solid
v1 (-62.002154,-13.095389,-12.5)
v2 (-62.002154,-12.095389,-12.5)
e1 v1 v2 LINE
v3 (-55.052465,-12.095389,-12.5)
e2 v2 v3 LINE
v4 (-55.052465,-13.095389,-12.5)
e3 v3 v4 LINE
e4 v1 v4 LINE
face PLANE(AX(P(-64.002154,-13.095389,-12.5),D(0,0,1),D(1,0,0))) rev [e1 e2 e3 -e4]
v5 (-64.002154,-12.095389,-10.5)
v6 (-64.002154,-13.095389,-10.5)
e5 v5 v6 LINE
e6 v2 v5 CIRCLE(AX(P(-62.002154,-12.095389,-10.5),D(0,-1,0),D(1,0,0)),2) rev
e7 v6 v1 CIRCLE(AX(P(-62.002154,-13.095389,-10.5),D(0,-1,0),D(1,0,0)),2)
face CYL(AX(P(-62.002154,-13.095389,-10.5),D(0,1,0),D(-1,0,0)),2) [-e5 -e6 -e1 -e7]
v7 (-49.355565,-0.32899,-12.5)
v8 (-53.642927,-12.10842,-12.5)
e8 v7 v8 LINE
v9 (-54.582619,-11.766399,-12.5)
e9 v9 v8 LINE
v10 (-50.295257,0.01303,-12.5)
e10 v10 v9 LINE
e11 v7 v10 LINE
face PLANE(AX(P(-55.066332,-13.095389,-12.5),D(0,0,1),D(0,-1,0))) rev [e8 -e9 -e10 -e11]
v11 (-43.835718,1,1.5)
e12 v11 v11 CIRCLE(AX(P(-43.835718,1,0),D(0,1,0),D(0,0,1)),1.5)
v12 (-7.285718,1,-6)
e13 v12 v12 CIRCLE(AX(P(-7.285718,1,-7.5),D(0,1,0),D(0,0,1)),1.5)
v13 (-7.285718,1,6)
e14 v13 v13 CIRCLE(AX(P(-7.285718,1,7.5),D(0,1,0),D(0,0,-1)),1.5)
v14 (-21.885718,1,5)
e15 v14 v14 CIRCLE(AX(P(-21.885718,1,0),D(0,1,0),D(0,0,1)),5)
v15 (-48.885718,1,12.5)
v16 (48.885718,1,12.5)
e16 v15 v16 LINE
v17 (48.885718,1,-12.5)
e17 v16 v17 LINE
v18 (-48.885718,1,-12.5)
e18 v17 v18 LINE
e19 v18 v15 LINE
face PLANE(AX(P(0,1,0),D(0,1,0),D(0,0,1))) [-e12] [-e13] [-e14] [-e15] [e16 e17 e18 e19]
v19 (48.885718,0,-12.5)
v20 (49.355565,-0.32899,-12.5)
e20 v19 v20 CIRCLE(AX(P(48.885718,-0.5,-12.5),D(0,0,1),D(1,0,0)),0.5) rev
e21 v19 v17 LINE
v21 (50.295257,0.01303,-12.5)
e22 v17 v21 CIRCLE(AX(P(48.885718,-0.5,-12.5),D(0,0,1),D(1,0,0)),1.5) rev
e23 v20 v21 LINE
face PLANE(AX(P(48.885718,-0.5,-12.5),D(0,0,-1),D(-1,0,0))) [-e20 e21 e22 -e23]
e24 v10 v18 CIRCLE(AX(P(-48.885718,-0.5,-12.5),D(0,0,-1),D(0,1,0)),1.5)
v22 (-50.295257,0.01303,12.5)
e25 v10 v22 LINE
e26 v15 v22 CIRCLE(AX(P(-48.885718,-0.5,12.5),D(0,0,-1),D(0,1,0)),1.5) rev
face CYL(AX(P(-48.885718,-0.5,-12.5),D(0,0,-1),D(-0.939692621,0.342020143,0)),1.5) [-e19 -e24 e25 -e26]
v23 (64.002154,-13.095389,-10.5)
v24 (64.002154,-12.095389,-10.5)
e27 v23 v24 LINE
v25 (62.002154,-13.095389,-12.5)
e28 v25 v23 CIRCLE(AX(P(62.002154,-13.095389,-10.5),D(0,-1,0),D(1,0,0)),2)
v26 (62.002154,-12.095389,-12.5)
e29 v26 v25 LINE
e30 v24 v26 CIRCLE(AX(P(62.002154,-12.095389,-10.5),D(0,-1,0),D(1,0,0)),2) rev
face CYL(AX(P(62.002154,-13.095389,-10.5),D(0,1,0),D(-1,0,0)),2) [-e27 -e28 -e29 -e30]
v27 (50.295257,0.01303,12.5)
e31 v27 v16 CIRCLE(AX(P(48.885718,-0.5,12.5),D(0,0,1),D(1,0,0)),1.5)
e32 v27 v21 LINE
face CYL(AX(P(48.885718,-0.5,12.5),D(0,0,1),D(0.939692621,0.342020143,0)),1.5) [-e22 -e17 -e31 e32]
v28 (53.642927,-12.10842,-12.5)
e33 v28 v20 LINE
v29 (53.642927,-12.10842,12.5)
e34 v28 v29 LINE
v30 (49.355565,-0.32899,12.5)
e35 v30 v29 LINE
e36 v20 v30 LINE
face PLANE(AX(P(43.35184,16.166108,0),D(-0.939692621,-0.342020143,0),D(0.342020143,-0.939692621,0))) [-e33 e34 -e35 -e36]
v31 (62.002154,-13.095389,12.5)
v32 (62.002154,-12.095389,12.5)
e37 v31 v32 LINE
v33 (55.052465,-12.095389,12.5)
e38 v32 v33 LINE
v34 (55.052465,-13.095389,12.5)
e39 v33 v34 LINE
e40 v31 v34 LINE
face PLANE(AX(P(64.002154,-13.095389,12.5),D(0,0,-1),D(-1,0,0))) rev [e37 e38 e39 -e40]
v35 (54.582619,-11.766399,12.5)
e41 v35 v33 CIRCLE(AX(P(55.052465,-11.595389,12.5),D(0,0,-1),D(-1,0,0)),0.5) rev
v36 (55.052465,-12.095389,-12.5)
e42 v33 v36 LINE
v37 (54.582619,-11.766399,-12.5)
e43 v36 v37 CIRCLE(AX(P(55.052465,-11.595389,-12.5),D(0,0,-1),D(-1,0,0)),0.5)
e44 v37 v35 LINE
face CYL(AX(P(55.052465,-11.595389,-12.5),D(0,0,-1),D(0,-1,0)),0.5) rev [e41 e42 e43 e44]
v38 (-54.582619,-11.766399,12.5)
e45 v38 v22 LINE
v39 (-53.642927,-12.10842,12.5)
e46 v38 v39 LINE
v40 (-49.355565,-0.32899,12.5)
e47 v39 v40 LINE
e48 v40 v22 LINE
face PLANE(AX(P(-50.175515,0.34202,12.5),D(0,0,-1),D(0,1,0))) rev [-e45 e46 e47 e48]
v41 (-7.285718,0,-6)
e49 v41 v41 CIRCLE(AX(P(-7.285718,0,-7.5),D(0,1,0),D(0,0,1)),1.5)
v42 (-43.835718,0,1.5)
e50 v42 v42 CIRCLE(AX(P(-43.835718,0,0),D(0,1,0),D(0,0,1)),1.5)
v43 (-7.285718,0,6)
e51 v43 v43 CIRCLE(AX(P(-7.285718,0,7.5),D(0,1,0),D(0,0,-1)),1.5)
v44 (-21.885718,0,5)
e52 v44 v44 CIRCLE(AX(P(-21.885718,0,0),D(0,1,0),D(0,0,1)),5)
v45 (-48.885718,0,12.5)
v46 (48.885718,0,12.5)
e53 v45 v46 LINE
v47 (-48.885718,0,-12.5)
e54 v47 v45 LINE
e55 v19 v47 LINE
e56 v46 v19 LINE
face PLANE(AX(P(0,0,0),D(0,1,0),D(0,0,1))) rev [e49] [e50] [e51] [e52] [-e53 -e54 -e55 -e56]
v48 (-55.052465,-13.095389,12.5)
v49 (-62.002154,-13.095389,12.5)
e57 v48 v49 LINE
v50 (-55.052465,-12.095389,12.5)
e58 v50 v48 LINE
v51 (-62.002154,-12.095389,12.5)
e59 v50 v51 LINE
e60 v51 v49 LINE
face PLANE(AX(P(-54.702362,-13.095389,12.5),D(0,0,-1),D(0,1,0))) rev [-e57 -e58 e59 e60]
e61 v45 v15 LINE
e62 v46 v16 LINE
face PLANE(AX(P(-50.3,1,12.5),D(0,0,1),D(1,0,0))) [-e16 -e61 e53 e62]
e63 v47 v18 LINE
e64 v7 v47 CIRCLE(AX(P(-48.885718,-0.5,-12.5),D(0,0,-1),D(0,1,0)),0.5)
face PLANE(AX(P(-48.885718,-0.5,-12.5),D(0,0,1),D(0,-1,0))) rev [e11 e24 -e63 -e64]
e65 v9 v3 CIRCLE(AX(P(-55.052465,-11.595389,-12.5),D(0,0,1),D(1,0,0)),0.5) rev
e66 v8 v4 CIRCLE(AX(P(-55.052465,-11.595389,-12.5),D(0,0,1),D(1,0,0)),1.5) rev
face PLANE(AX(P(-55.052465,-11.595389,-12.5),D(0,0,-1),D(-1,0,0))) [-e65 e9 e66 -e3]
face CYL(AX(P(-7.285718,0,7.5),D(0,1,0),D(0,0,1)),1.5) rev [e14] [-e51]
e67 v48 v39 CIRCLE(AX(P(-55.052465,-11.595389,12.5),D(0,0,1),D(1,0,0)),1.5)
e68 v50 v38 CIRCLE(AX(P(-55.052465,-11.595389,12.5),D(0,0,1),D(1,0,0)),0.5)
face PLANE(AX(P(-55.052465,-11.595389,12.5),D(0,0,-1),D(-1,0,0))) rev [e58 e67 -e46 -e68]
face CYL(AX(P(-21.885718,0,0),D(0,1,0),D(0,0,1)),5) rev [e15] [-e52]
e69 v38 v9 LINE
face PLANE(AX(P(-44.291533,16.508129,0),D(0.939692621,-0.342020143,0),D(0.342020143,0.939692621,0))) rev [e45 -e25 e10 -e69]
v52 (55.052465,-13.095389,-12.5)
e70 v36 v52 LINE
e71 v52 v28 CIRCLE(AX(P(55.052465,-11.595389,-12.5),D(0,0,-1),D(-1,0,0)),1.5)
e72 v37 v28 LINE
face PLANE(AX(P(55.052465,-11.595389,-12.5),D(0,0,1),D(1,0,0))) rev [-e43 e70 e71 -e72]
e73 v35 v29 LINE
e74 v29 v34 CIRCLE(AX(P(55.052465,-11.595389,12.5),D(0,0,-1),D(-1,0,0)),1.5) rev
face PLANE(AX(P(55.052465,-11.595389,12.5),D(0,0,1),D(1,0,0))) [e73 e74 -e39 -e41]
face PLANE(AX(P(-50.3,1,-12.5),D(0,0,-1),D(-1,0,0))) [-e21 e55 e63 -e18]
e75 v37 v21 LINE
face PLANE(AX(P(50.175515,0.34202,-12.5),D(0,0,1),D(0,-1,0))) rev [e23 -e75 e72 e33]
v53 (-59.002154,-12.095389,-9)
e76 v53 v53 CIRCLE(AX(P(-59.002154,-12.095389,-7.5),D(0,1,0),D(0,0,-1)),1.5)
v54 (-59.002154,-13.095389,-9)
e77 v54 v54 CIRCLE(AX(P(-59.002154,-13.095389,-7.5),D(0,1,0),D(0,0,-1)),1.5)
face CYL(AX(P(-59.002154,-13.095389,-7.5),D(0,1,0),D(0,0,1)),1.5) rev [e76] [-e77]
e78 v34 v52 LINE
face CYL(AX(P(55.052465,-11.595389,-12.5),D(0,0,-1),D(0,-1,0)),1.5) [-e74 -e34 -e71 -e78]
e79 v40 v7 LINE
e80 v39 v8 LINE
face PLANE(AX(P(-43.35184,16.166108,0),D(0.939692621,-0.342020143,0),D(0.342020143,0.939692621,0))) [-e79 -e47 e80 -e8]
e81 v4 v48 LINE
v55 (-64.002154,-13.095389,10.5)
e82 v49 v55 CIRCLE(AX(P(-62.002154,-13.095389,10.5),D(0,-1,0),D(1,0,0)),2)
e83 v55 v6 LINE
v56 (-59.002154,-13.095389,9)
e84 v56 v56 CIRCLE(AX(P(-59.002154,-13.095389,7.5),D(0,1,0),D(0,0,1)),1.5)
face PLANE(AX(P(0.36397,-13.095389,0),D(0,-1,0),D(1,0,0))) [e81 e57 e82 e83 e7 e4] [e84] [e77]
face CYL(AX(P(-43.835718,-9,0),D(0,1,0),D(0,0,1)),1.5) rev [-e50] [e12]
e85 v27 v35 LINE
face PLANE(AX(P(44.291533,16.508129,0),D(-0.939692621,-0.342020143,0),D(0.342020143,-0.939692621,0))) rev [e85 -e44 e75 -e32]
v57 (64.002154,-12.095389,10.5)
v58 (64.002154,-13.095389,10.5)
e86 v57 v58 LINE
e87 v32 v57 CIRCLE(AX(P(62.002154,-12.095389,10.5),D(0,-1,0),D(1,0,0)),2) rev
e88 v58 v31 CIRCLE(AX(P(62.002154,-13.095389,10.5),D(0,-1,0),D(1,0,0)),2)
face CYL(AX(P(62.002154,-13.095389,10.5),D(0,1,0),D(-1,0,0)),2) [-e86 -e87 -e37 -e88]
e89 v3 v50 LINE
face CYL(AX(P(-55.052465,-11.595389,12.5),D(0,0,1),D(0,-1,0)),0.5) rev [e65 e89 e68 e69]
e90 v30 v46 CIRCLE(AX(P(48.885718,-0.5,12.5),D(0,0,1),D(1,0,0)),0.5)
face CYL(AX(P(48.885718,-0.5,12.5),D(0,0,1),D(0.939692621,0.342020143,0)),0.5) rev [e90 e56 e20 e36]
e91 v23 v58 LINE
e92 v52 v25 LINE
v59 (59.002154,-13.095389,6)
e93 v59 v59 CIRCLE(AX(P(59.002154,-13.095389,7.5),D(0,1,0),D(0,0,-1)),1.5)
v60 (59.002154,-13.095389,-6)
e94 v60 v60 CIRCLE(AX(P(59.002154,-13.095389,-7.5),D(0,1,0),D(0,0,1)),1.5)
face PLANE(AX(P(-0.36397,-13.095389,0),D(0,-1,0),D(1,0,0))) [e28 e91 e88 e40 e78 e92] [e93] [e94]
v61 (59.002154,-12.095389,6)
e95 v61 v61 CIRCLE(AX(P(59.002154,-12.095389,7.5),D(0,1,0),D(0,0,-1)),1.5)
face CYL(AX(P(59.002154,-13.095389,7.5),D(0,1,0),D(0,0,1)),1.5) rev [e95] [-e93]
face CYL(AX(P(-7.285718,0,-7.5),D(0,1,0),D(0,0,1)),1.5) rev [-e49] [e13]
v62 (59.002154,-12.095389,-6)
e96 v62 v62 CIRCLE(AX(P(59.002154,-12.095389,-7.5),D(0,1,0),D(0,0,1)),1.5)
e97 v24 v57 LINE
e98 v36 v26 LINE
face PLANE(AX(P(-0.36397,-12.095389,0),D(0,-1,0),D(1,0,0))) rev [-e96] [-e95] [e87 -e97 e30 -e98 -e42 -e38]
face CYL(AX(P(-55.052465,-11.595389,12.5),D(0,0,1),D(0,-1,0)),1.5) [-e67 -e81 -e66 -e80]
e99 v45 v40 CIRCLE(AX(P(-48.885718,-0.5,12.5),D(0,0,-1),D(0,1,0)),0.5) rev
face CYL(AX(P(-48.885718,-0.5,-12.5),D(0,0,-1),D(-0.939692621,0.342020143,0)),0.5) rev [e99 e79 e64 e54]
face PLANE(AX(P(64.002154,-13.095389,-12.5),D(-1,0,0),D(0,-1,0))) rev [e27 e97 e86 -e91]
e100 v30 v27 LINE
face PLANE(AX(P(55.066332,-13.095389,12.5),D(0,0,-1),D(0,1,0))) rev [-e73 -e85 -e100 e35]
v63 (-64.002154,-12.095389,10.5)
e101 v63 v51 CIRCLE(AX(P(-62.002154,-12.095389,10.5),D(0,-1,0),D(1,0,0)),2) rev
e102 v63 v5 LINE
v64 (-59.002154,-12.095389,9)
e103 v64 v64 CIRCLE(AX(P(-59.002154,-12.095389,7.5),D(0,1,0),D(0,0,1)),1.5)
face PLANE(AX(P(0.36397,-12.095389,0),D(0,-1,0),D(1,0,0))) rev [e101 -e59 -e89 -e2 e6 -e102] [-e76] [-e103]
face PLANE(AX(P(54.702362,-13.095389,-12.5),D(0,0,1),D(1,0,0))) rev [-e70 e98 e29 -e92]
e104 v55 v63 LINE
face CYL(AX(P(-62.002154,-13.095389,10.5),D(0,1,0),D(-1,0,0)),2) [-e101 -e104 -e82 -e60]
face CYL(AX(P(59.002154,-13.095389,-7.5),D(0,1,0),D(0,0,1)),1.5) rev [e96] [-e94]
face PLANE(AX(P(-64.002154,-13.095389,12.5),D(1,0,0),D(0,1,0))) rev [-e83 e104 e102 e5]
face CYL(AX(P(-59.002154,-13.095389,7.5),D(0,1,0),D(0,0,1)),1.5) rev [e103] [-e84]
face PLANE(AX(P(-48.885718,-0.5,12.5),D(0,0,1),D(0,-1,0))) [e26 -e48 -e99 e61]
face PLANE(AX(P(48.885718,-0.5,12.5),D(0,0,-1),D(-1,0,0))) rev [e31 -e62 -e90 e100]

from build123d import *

# Parameters (mm, degrees)
SKETCH_1_W               = 100.6
SKETCH_1_H               = 25
EXTRUDE_1_DEPTH          = 1
SM_START                 = -12.5
SM_EDGE_FLANGE_1_DEPTH   = 25
SM_EDGE_FLANGE_1_2_DEPTH = 25
SM_EDGE_FLANGE_2_DEPTH   = 25
SM_EDGE_FLANGE_2_2_DEPTH = 25
SKETCH_18_R              = 1.5
CUT_EXTRUDE_1_DEPTH      = 1
SKETCH_19_R              = 1.5
CUT_EXTRUDE_2_DEPTH      = 1
FILLET_1_R               = 2
SKETCH_21_R              = 5
CUT_EXTRUDE_3_DEPTH      = 1
SKETCH_22_R              = 1.5
CUT_EXTRUDE_4_DEPTH      = 10


# Read off the part's stored shape, not the designer's step: Ребро-кромка1, Ребро-кромка2
with BuildPart() as part:
    # Sketch 1 → Бобышка-Вытянуть1 (new body)
    with BuildSketch(Plane(origin=(0, 0, 0), x_dir=(1, 0, 0), z_dir=(0, 1, 0))):
        Rectangle(SKETCH_1_W, SKETCH_1_H)
    extrude(amount=EXTRUDE_1_DEPTH)

    # Ребро-кромка1 outline → Ребро-кромка1 (cut)
    with BuildSketch(Plane.XY.offset(SM_START)):
        with BuildLine():
            Line((-50.3, 0), (-50.29525739, 0.013030215))
            ThreePointArc((-50.29525739, 0.013030215), (-49.746083113, 0.728728066), (-48.885718458, 1))
            Line((-48.885718458, 1), (-50.3, 1))
            Line((-50.3, 1), (-50.3, 0))
        make_face()
        with BuildLine():
            Line((50.3, 1), (48.885718458, 1))
            ThreePointArc((48.885718458, 1), (49.746083113, 0.728728066), (50.29525739, 0.013030215))
            Line((50.29525739, 0.013030215), (50.3, 0))
            Line((50.3, 0), (50.3, 1))
        make_face()
    extrude(amount=SM_EDGE_FLANGE_1_DEPTH, mode=Mode.SUBTRACT)

    # Sm Edge Flange 1 2 outline → Sm Edge Flange 1 2 (add)
    with BuildSketch(Plane.XY.offset(SM_START)):
        with BuildLine():
            Line((-48.885718458, 0), (-50.3, 0))
            Line((-50.3, 0), (-55.066331916, -13.095389312))
            Line((-55.066331916, -13.095389312), (-54.126639295, -13.437409455))
            Line((-54.126639295, -13.437409455), (-49.355564769, -0.328989928))
            ThreePointArc((-49.355564769, -0.328989928), (-49.172506676, -0.090423978), (-48.885718458, 0))
        make_face()
        with BuildLine():
            Line((50.3, 0), (48.885718458, 0))
            ThreePointArc((48.885718458, 0), (49.172506676, -0.090423978), (49.355564769, -0.328989928))
            Line((49.355564769, -0.328989928), (54.126639295, -13.437409455))
            Line((54.126639295, -13.437409455), (55.066331916, -13.095389312))
            Line((55.066331916, -13.095389312), (50.3, 0))
        make_face()
    extrude(amount=SM_EDGE_FLANGE_1_2_DEPTH)

    # Ребро-кромка2 outline → Ребро-кромка2 (cut)
    with BuildSketch(Plane.XY.offset(SM_START)):
        with BuildLine():
            Line((55.066331916, -13.095389312), (55.05246545, -13.095389312))
            ThreePointArc((55.05246545, -13.095389312), (54.192100796, -12.824117378), (53.642926519, -12.108419527))
            Line((53.642926519, -12.108419527), (54.126639295, -13.437409455))
            Line((54.126639295, -13.437409455), (55.066331916, -13.095389312))
        make_face()
        with BuildLine():
            Line((-55.05246545, -13.095389312), (-55.066331916, -13.095389312))
            Line((-55.066331916, -13.095389312), (-54.126639295, -13.437409455))
            Line((-54.126639295, -13.437409455), (-53.642926519, -12.108419527))
            ThreePointArc((-53.642926519, -12.108419527), (-54.192100796, -12.824117378), (-55.05246545, -13.095389312))
        make_face()
    extrude(amount=SM_EDGE_FLANGE_2_DEPTH, mode=Mode.SUBTRACT)

    # Sm Edge Flange 2 2 outline → Sm Edge Flange 2 2 (add)
    with BuildSketch(Plane.XY.offset(SM_START)):
        with BuildLine():
            Line((54.58261914, -11.766399383), (55.066331916, -13.095389312))
            Line((55.066331916, -13.095389312), (64.002154143, -13.095389312))
            Line((64.002154143, -13.095389312), (64.002154143, -12.095389312))
            Line((64.002154143, -12.095389312), (55.05246545, -12.095389312))
            ThreePointArc((55.05246545, -12.095389312), (54.765677232, -12.004965334), (54.58261914, -11.766399383))
        make_face()
        with BuildLine():
            Line((-64.002154143, -12.095389312), (-64.002154143, -13.095389312))
            Line((-64.002154143, -13.095389312), (-55.066331916, -13.095389312))
            Line((-55.066331916, -13.095389312), (-54.58261914, -11.766399383))
            ThreePointArc((-54.58261914, -11.766399383), (-54.765677232, -12.004965334), (-55.05246545, -12.095389312))
            Line((-55.05246545, -12.095389312), (-64.002154143, -12.095389312))
        make_face()
    extrude(amount=SM_EDGE_FLANGE_2_2_DEPTH)

    # Эскиз18 → Вырез-Вытянуть1 (cut)
    with BuildSketch(Plane(origin=(0, 1, 0), x_dir=(1, 0, 0), z_dir=(0, 1, 0))):
        with Locations(Location((-7.285718458, 7.5, 0), (0, 0, 270))):
            Circle(SKETCH_18_R)
        with Locations(Location((-7.285718458, -7.5, 0), (0, 0, 90))):
            Circle(SKETCH_18_R)
    extrude(amount=-CUT_EXTRUDE_1_DEPTH, mode=Mode.SUBTRACT)

    # Эскиз19 → Вырез-Вытянуть2 (cut)
    with BuildSketch(Plane(origin=(0, -12.095389312, 0), x_dir=(1, 0, 0), z_dir=(0, 1, 0))):
        with Locations(Location((59.002154143, 7.5, 0), (0, 0, 270))):
            Circle(SKETCH_19_R)
        with Locations(Location((59.002154143, -7.5, 0), (0, 0, 90))):
            Circle(SKETCH_19_R)
        with Locations(Location((-59.002154143, -7.5, 0), (0, 0, 270))):
            Circle(SKETCH_19_R)
        with Locations(Location((-59.002154143, 7.5, 0), (0, 0, 90))):
            Circle(SKETCH_19_R)
    extrude(amount=-CUT_EXTRUDE_2_DEPTH, mode=Mode.SUBTRACT)

    # Скругление1
    fillet_1_edges = [part.edges().sort_by_distance(p)[0] for p in [
        (64.002154143, -12.595389312, 12.5),
        (64.002154143, -12.595389312, -12.5),
        (-64.002154143, -12.595389312, -12.5),
        (-64.002154143, -12.595389312, 12.5),
    ]]
    fillet(fillet_1_edges, radius=FILLET_1_R)

    # Эскиз21 → Вырез-Вытянуть3 (cut)
    with BuildSketch(Plane(origin=(0, 1, 0), x_dir=(1, 0, 0), z_dir=(0, 1, 0))):
        with Locations(Location((-21.885718458, 0, 0), (0, 0, 270))):
            Circle(SKETCH_21_R)
    extrude(amount=-CUT_EXTRUDE_3_DEPTH, mode=Mode.SUBTRACT)

    # Эскиз22 → Вырез-Вытянуть4 (cut)
    with BuildSketch(Plane(origin=(0, 1, 0), x_dir=(1, 0, 0), z_dir=(0, 1, 0))):
        with Locations(Location((-43.835718458, 0, 0), (0, 0, 270))):
            Circle(SKETCH_22_R)
    extrude(amount=-CUT_EXTRUDE_4_DEPTH, mode=Mode.SUBTRACT)


solid = part.part
